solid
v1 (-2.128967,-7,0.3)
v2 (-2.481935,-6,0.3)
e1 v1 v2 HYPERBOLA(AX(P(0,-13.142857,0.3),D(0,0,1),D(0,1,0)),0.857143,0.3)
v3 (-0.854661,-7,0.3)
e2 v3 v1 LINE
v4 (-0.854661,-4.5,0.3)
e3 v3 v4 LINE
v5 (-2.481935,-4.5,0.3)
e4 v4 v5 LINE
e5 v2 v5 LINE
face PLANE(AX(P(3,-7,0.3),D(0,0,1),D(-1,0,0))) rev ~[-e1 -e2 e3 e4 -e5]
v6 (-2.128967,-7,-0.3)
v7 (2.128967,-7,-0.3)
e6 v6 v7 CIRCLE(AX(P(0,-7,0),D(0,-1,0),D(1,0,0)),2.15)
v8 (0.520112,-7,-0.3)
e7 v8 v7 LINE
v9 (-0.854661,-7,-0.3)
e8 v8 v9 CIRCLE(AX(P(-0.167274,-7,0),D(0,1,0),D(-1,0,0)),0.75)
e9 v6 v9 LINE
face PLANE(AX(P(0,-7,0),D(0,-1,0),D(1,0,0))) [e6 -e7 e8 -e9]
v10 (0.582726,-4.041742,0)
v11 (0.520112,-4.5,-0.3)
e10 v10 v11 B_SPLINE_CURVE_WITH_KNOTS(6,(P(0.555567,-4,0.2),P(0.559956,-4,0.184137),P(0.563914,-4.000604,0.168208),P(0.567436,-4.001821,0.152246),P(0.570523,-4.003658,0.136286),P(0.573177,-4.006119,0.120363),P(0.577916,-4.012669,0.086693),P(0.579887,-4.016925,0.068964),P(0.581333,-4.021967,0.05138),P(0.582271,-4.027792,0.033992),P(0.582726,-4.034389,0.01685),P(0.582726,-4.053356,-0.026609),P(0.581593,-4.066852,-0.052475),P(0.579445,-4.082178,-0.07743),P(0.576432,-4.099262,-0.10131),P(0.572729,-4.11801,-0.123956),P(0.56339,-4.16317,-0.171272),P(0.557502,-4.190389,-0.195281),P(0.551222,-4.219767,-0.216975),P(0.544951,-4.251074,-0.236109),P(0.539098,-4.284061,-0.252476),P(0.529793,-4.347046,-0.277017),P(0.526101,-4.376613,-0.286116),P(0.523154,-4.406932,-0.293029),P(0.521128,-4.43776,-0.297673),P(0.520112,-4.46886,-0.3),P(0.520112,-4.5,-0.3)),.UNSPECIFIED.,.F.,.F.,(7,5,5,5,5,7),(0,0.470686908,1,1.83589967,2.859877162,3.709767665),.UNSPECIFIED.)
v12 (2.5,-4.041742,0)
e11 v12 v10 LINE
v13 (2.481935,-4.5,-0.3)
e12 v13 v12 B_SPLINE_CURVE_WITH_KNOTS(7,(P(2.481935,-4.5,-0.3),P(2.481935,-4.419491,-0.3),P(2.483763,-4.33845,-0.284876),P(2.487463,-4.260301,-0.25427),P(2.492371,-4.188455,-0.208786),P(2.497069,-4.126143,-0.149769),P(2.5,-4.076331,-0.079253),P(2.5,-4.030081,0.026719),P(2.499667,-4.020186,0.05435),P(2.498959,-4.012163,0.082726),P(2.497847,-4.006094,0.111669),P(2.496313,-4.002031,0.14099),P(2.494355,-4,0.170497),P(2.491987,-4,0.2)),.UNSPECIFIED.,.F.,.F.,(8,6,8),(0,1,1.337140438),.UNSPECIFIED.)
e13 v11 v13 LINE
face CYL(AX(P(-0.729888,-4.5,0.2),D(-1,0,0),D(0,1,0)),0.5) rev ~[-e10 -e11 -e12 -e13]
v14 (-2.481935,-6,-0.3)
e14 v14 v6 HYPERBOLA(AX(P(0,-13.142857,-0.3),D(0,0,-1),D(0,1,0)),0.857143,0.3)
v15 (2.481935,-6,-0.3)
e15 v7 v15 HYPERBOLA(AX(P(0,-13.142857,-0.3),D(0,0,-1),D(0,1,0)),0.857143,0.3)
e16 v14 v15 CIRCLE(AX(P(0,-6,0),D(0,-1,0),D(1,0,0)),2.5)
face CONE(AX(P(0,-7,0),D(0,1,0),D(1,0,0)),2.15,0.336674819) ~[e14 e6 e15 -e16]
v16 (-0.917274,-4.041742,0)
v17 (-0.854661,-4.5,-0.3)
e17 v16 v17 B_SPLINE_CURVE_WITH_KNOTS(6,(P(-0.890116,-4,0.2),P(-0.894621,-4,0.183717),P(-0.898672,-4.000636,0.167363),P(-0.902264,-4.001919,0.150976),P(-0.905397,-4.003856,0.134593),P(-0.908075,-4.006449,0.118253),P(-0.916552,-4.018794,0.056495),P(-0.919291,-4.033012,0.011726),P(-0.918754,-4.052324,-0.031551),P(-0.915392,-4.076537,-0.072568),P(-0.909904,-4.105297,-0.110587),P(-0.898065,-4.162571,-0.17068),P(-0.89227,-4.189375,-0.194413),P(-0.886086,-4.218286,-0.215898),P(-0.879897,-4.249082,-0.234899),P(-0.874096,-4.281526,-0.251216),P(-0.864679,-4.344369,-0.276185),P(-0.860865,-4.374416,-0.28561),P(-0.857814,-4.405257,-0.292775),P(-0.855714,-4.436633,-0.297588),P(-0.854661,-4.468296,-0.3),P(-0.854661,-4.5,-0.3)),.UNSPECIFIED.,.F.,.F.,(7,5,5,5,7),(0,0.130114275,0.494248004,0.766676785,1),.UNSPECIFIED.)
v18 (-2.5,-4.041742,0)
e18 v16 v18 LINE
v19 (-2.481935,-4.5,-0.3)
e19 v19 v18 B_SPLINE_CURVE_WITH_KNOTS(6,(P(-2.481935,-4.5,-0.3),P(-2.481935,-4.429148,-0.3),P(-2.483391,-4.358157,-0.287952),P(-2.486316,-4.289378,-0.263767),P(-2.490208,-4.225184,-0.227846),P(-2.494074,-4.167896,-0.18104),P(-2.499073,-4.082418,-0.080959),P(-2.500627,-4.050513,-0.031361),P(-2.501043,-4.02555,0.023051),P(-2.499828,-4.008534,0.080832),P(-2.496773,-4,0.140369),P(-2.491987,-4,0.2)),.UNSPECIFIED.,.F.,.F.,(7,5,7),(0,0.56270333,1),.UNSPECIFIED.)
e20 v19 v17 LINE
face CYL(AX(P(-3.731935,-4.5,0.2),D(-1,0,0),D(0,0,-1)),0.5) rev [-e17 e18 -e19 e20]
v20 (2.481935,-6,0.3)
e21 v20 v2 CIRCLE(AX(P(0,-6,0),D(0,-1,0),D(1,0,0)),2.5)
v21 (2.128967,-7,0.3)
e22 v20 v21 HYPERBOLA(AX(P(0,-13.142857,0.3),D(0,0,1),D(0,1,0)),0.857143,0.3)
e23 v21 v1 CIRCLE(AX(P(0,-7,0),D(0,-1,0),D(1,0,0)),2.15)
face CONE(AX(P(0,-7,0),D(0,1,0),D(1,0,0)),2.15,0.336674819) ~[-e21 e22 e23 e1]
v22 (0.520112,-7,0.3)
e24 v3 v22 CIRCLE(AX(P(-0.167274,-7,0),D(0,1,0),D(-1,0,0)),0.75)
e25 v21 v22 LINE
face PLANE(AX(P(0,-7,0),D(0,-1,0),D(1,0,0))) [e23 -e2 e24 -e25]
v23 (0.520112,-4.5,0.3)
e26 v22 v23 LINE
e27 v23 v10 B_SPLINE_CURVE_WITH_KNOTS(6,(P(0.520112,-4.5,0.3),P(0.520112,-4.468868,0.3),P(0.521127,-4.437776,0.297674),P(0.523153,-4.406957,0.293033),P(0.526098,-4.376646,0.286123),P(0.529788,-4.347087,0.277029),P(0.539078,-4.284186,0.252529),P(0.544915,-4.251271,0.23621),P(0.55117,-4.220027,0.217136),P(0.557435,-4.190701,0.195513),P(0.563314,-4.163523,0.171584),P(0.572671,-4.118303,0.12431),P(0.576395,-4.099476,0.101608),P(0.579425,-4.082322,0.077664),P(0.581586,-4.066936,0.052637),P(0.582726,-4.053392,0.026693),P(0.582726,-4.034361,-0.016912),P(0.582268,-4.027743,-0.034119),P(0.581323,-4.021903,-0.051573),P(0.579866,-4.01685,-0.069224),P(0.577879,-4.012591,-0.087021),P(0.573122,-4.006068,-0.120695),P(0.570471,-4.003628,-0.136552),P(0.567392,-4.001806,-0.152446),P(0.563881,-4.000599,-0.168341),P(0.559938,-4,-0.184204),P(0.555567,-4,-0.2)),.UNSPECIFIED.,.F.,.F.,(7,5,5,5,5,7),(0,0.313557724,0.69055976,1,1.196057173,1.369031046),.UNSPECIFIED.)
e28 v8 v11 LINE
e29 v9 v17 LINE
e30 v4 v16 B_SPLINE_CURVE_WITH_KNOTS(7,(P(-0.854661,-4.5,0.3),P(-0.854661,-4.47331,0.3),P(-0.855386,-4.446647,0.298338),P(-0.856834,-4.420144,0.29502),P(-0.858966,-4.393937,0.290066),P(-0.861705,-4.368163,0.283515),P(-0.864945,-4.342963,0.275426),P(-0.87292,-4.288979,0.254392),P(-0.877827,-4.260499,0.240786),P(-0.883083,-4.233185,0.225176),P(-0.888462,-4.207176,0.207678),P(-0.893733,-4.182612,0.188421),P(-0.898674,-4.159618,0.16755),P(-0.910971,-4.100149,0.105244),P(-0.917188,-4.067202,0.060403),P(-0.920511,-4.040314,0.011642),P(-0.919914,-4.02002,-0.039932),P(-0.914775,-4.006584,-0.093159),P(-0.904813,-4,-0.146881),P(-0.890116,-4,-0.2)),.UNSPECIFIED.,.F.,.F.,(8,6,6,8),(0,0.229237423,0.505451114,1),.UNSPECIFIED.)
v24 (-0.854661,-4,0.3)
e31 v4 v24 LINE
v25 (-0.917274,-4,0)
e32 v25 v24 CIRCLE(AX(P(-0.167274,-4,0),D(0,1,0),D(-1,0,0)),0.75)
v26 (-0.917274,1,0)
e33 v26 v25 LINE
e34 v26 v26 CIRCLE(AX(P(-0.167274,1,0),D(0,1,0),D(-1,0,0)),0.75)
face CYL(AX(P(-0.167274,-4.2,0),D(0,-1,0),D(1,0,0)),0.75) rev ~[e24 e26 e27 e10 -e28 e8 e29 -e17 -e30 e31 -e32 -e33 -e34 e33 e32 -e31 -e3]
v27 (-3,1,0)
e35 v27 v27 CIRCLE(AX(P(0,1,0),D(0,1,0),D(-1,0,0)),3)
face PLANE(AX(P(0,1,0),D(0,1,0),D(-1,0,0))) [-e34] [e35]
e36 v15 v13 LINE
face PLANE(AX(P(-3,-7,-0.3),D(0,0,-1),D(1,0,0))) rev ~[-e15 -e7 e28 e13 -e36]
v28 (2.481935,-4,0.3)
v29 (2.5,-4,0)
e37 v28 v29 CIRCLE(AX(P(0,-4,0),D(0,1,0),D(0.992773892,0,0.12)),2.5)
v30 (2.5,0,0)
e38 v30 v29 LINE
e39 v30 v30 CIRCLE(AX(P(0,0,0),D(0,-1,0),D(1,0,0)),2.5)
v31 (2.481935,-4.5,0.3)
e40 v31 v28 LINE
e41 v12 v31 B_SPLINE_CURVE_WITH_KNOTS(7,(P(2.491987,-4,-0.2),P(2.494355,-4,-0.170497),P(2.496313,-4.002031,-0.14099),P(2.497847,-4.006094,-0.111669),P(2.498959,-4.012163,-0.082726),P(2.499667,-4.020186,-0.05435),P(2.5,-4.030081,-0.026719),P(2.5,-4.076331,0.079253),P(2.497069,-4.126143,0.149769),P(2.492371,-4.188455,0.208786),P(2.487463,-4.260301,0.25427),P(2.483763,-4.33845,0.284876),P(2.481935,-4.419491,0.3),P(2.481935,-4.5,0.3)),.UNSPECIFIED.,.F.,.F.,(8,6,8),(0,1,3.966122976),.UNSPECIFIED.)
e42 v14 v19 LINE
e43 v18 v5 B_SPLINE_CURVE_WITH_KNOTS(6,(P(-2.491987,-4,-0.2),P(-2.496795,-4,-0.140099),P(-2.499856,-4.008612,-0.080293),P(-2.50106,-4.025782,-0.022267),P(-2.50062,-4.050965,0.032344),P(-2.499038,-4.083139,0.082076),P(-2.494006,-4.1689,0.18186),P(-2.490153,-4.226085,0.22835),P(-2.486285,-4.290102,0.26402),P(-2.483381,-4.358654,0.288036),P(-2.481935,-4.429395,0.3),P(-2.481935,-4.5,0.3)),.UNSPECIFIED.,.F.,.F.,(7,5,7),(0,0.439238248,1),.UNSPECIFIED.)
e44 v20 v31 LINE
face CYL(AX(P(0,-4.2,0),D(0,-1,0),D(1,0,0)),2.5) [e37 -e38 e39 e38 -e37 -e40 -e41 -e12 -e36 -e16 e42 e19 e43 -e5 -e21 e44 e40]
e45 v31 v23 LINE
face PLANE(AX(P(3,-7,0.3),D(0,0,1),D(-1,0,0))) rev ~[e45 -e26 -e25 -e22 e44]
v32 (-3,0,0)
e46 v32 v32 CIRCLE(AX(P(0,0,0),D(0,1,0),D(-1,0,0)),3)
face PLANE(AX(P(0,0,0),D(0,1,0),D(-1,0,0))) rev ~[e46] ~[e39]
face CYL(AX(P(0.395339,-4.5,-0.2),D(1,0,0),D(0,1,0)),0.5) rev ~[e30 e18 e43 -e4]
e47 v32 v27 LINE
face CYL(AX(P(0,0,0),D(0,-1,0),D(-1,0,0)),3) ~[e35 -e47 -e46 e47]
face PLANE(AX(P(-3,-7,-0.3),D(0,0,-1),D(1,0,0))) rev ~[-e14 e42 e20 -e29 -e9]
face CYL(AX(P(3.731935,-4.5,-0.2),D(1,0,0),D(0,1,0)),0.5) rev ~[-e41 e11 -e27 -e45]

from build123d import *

# Parameters (mm, degrees)
F0_R          = 2.5
F1_DEPTH      = 6
F3_R          = 2.15
F1_FACE_R     = 2.5
F6_R          = 3
F7_DEPTH      = 1
F9_R          = 0.75
F10_DEPTH     = 8.0010001
F12_W         = 3
F12_H         = 0.3
F13_DEPTH     = 3
F14_T4_DEPTH  = 4.4618227718
F14_S5_R      = 2.5
F14_T6_DEPTH  = 4
F14_S7_R      = 0.75
F14_T8_DEPTH  = 4
F14_T12_DEPTH = 4.1272739781
F14_S13_R     = 2.5
F14_T14_DEPTH = 4
F14_S15_R     = 0.75
F14_T16_DEPTH = 4
F14_T20_DEPTH = 4.4618227718
F14_S21_R     = 2.5
F14_T22_DEPTH = 4
F14_S23_R     = 0.75
F14_T24_DEPTH = 4
F14_T28_DEPTH = 4.1272739781
F14_S29_R     = 2.5
F14_T30_DEPTH = 4
F14_S31_R     = 0.75
F14_T32_DEPTH = 4


# Not quite as in the source:
# - a fillet or chamfer that OpenCascade refuses, or shapes differently, is made with other operations: its cross-section is extruded or revolved along the edge and cut away or added


with BuildPart() as f1:
    # F0 (on Front) → F1 (new body)
    with BuildSketch(Plane.XZ):
        Circle(F0_R)
    extrude(amount=F1_DEPTH)

    # F3 (on offset) → F4 section 0
    with BuildSketch(Plane.XZ.offset(7)):
        Circle(F3_R)
    # F1_face (on face) → F4 section 1
    with BuildSketch(Plane.XZ.offset(6)):
        Circle(F1_FACE_R)
    loft()

    # F6 (on offset) → F7 (join)
    with BuildSketch(Plane(origin=(0, 0, 0), x_dir=(-1, 0, 0), z_dir=(0, 1, 0))):
        Circle(F6_R)
    extrude(amount=F7_DEPTH)

    # F9 (on offset) → F10 (cut, through all)
    with BuildSketch(Plane(origin=(0, 1, 0), x_dir=(-1, 0, 0), z_dir=(0, 1, 0))):
        with Locations((0.1672743968, 0)):
            Circle(F9_R)
    extrude(amount=-F10_DEPTH, mode=Mode.SUBTRACT)

    # F12 (on offset) → F13 (cut)
    with BuildSketch(Plane.XZ.offset(7)):
        with Locations((1.5, 0.15)):
            Rectangle(F12_W, F12_H)
        Polygon((3, 0), (0, 0), (0, 0.3), (-3, 0.3), (-3, 0), (-3, -0.3), (0, -0.3), (3, -0.3), align=None)
    extrude(amount=-F13_DEPTH, mode=Mode.SUBTRACT)

    # F14: fillet of radius 0.5 on 4 edges, made by hand


with BuildPart() as f14_tool2:
    # F14_s3 → F14_t4 (new body)
    with BuildSketch(Plane.YZ.offset(-0.7298880426)):
        with BuildLine():
            ThreePointArc((-4, 0.2), (-4.1464466094, -0.1535533906), (-4.5, -0.3))
            Line((-4.5, -0.3), (-4, -0.3))
            Line((-4, -0.3), (-4, 0.2))
        make_face()
    extrude(amount=F14_T4_DEPTH)

    # F14_s5 → F14_t6 (intersect, symmetric)
    with BuildSketch(Plane.XZ.offset(4.2)):
        Circle(F14_S5_R)
    extrude(amount=F14_T6_DEPTH, both=True, mode=Mode.INTERSECT)

    # F14_s7 → F14_t8 (cut, symmetric)
    with BuildSketch(Plane.XZ.offset(4.2)):
        with Locations((-0.1672743968, 0)):
            Circle(F14_S7_R)
    extrude(amount=F14_T8_DEPTH, both=True, mode=Mode.SUBTRACT)


with BuildPart() as f1_1:
    add(f1.part)

    # F14_t1: union F14_tool2
    add(f14_tool2.part)


with BuildPart() as f14_tool10:
    # F14_s11 → F14_t12 (new body)
    with BuildSketch(Plane.YZ.offset(-3.7319347292)):
        with BuildLine():
            ThreePointArc((-4.5, -0.3), (-4.1464466094, -0.1535533906), (-4, 0.2))
            Line((-4, 0.2), (-4, -0.3))
            Line((-4, -0.3), (-4.5, -0.3))
        make_face()
    extrude(amount=F14_T12_DEPTH)

    # F14_s13 → F14_t14 (intersect, symmetric)
    with BuildSketch(Plane.XZ.offset(4.2)):
        Circle(F14_S13_R)
    extrude(amount=F14_T14_DEPTH, both=True, mode=Mode.INTERSECT)

    # F14_s15 → F14_t16 (cut, symmetric)
    with BuildSketch(Plane.XZ.offset(4.2)):
        with Locations((-0.1672743968, 0)):
            Circle(F14_S15_R)
    extrude(amount=F14_T16_DEPTH, both=True, mode=Mode.SUBTRACT)


with BuildPart() as f1_2:
    add(f1_1.part)

    # F14_t9: union F14_tool10
    add(f14_tool10.part)


with BuildPart() as f14_tool18:
    # F14_s19 → F14_t20 (new body)
    with BuildSketch(Plane.YZ.offset(3.7319347292)):
        with BuildLine():
            ThreePointArc((-4, -0.2), (-4.1464466094, 0.1535533906), (-4.5, 0.3))
            Line((-4.5, 0.3), (-4, 0.3))
            Line((-4, 0.3), (-4, -0.2))
        make_face()
    extrude(amount=-F14_T20_DEPTH)

    # F14_s21 → F14_t22 (intersect, symmetric)
    with BuildSketch(Plane.XZ.offset(4.2)):
        Circle(F14_S21_R)
    extrude(amount=F14_T22_DEPTH, both=True, mode=Mode.INTERSECT)

    # F14_s23 → F14_t24 (cut, symmetric)
    with BuildSketch(Plane.XZ.offset(4.2)):
        with Locations((-0.1672743968, 0)):
            Circle(F14_S23_R)
    extrude(amount=F14_T24_DEPTH, both=True, mode=Mode.SUBTRACT)


with BuildPart() as f1_3:
    add(f1_2.part)

    # F14_t17: union F14_tool18
    add(f14_tool18.part)


with BuildPart() as f14_tool26:
    # F14_s27 → F14_t28 (new body)
    with BuildSketch(Plane.YZ.offset(0.3953392489)):
        with BuildLine():
            ThreePointArc((-4, -0.2), (-4.1464466094, 0.1535533906), (-4.5, 0.3))
            Line((-4.5, 0.3), (-4, 0.3))
            Line((-4, 0.3), (-4, -0.2))
        make_face()
    extrude(amount=-F14_T28_DEPTH)

    # F14_s29 → F14_t30 (intersect, symmetric)
    with BuildSketch(Plane.XZ.offset(4.2)):
        Circle(F14_S29_R)
    extrude(amount=F14_T30_DEPTH, both=True, mode=Mode.INTERSECT)

    # F14_s31 → F14_t32 (cut, symmetric)
    with BuildSketch(Plane.XZ.offset(4.2)):
        with Locations((-0.1672743968, 0)):
            Circle(F14_S31_R)
    extrude(amount=F14_T32_DEPTH, both=True, mode=Mode.SUBTRACT)


with BuildPart() as f1_4:
    add(f1_3.part)

    # F14_t25: union F14_tool26
    add(f14_tool26.part)


solid = f1_4.part
